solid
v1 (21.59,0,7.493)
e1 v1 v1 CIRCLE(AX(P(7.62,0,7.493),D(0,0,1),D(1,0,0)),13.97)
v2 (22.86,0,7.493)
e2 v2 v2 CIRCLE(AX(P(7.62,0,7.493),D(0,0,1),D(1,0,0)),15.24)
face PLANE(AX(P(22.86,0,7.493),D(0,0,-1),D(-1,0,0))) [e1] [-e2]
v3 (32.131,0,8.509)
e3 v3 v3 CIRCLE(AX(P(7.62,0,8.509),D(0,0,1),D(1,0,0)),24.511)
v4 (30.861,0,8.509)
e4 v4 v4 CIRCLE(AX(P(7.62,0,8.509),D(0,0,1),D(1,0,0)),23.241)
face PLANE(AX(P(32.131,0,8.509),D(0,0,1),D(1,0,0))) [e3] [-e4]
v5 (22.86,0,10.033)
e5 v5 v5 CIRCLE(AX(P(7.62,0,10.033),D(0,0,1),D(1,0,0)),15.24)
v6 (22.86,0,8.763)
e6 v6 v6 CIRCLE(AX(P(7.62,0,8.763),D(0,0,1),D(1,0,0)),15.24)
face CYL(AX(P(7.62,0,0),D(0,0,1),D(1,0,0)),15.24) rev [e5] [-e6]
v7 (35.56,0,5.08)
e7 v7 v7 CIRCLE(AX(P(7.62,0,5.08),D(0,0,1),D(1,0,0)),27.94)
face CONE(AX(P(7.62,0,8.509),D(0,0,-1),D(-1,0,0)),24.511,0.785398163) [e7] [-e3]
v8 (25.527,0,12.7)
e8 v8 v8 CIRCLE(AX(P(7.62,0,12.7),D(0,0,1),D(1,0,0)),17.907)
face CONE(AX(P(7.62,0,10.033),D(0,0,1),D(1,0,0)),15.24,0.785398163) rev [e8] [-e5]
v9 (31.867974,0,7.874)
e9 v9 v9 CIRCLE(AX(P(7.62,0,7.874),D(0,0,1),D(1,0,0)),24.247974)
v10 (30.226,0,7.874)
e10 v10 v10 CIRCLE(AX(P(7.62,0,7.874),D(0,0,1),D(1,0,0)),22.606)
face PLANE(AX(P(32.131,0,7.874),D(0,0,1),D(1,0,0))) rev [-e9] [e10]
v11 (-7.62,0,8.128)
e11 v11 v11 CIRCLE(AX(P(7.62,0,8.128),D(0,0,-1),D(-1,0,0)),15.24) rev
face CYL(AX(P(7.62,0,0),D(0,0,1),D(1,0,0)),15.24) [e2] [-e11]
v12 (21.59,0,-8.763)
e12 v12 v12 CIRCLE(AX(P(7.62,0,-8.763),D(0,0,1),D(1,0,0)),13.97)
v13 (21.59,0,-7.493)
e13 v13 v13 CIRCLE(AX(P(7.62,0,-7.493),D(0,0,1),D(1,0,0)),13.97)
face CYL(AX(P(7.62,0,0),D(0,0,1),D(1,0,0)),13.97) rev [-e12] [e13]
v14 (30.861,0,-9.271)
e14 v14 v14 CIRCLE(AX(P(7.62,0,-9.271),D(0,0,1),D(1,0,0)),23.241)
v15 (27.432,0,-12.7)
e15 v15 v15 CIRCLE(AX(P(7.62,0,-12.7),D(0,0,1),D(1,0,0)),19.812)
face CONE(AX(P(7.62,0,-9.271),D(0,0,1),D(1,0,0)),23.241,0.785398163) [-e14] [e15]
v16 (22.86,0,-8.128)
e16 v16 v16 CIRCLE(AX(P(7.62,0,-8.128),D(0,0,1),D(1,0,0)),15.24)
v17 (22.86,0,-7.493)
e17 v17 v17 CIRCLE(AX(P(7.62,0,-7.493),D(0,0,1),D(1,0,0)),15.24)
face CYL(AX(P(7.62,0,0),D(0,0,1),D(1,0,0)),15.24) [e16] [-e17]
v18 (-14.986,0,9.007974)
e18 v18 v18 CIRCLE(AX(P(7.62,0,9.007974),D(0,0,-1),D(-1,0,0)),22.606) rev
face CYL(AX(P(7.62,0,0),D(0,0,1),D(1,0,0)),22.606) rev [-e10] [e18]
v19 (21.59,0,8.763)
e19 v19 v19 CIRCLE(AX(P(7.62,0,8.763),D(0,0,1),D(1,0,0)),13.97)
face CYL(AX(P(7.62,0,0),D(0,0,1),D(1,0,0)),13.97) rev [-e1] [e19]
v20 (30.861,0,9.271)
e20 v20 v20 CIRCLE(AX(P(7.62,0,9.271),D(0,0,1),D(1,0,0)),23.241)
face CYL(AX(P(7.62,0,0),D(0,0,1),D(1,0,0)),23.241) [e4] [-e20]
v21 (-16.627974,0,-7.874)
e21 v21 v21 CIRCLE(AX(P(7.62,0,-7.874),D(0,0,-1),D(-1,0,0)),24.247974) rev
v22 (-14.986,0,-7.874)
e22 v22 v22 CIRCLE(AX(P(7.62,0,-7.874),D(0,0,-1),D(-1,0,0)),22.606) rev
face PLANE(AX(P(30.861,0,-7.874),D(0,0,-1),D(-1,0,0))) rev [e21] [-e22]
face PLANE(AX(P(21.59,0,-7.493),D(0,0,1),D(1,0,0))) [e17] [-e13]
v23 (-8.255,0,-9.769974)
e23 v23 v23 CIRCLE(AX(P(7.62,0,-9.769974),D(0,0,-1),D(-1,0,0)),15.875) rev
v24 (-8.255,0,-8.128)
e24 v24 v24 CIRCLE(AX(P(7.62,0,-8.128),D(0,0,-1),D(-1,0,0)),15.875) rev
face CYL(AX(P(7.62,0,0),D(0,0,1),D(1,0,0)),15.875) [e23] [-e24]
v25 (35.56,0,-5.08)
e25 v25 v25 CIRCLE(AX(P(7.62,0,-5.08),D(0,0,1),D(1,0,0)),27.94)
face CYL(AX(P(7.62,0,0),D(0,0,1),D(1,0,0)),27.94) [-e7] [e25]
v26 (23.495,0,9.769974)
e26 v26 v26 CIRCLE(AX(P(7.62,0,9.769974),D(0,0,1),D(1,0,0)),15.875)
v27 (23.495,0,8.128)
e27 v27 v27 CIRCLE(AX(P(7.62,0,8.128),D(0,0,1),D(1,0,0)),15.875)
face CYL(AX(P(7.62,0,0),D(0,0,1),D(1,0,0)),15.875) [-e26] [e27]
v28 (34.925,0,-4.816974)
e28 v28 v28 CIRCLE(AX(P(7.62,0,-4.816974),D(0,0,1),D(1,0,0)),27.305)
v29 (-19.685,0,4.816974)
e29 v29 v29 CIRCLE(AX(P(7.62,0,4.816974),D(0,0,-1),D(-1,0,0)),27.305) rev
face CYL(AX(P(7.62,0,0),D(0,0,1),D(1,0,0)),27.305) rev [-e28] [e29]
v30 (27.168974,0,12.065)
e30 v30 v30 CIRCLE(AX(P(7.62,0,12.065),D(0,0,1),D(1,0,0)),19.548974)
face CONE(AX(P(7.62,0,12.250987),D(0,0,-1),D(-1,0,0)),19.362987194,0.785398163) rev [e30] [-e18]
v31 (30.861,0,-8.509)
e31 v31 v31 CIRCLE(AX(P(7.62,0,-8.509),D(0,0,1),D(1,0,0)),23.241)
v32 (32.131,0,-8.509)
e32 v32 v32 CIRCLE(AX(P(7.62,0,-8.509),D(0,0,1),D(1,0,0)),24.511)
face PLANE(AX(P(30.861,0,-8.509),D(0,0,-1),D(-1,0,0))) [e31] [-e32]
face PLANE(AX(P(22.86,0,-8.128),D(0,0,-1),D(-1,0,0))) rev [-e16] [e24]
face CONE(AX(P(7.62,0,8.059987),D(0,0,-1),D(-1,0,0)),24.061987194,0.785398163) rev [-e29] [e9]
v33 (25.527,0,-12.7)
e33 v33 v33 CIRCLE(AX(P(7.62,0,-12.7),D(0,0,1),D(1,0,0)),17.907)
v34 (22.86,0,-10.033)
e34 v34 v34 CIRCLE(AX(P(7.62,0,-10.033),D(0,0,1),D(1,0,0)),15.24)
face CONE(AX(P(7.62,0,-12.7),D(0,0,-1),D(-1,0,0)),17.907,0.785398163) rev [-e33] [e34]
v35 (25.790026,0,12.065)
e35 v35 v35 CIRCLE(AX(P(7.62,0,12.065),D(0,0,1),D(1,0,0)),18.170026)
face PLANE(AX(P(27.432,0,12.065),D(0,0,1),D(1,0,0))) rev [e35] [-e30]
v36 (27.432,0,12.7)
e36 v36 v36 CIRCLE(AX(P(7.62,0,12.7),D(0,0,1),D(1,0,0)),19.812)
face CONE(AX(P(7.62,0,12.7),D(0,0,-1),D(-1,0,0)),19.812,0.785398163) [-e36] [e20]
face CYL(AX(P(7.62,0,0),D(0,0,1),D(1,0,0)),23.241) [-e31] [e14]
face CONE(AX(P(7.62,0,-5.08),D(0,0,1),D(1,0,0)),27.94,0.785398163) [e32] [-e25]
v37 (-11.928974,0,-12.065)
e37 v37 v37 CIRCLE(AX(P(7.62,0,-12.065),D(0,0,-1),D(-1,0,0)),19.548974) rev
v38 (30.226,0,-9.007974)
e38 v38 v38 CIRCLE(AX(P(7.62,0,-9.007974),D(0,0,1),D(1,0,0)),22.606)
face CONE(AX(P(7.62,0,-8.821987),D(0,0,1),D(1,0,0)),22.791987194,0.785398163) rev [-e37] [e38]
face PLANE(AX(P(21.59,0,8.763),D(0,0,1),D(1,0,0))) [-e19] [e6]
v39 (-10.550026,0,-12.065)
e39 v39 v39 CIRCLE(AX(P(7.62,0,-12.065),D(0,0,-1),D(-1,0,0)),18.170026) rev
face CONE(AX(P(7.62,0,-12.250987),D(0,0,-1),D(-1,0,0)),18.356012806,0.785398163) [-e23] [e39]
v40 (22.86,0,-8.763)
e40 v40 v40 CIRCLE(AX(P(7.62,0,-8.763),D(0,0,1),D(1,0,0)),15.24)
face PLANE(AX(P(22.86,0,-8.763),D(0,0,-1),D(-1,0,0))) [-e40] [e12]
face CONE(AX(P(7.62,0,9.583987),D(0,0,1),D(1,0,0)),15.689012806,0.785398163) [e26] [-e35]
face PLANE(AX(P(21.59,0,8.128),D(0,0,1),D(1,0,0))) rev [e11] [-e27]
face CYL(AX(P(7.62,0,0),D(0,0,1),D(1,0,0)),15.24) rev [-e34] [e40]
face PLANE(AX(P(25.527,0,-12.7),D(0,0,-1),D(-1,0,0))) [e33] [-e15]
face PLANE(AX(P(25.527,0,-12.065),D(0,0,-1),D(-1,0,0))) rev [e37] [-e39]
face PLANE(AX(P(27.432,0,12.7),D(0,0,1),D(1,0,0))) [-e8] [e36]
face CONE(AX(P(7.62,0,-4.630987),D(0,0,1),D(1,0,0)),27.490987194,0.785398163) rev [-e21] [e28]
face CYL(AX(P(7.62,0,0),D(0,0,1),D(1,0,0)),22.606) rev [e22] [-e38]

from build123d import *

# Parameters (mm, degrees)
EXTRUDE1_DEPTH      = 3.81
EXTRUDE2_DEPTH      = 0.508
CUT_EXTRUDE2_DEPTH  = 15.255714644
EXTRUDE3_DEPTH      = 3.302
EXTRUDE4_REACH      = 14.636
SKETCH9_W           = 3.553663376
SKETCH9_H           = 0.1905
SKETCH11_R          = 2.286
CUT_EXTRUDE3_DEPTH  = 13.636340451
SKETCH12_R          = 3.175
CUT_EXTRUDE4_DEPTH  = 0.508
SKETCH13_OUTSIDE_W  = 29.914
SKETCH13_OUTSIDE_H  = 14.674
SKETCH13_OUTSIDE_R  = 3.81
CUT_EXTRUDE5_DEPTH  = 15.255714644
CUT_EXTRUDE7_START  = 6.604
CUT_EXTRUDE7_DEPTH  = 6.604
SCALE1_SCALE_X      = 1
SCALE1_SCALE_Y      = 1
SCALE1_SCALE_Z      = 2.633333333
EXTRUDE6_DEPTH      = 30.24890252
EXTRUDE6_DEPTH_BACK = 30.24890252
SKETCH20_R          = 2.286
SKETCH21_R          = 12.7
SKETCH21_R_2        = 3.81
EXTRUDE7_DEPTH      = 10.16
EXTRUDE7_TAPER      = 35


# Read off the part's stored shape, not the designer's step: Shell1
with BuildPart() as part:
    # Sketch1 → Extrude1 (new body)
    with BuildSketch(Plane(origin=(0, 0, 0), x_dir=(1, 0, 0), z_dir=(0, 1, 0))):
        with BuildLine():
            Line((-7.62, 3.81), (0, 3.81))
            ThreePointArc((0, 3.81), (3.81, 0), (0, -3.81))
            Line((0, -3.81), (-7.62, -3.81))
            ThreePointArc((-7.62, -3.81), (-11.43, 0), (-7.62, 3.81))
        make_face()
    extrude(amount=EXTRUDE1_DEPTH)

    # Sketch4 → Extrude2 (add)
    with BuildSketch(Plane.XY.offset(3.81)):
        with BuildLine():
            Line((0, 0), (0, 3.81))
            Line((0, 3.81), (7.62, 3.81))
            ThreePointArc((7.62, 3.81), (10.314076836, 2.694076836), (11.43, 0))
            Line((11.43, 0), (7.62, 0))
            Line((7.62, 0), (0, 0))
        make_face()
    extrude2 = extrude(amount=-EXTRUDE2_DEPTH)

    # Sketch6 → Cut-Extrude2 (cut, through all)
    with BuildSketch(Plane.XY.offset(3.81)):
        with BuildLine():
            Line((6.858, 2.032), (6.858, 1.016))
            ThreePointArc((6.858, 1.016), (6.783605122, 0.836394878), (6.604, 0.762))
            Line((6.604, 0.762), (5.588, 0.762))
            ThreePointArc((5.588, 0.762), (5.408394878, 0.687605122), (5.334, 0.508))
            Line((5.334, 0.508), (5.334, -0.508))
            ThreePointArc((5.334, -0.508), (5.408394878, -0.687605122), (5.588, -0.762))
            Line((5.588, -0.762), (6.604, -0.762))
            ThreePointArc((6.604, -0.762), (6.783605122, -0.836394878), (6.858, -1.016))
            Line((6.858, -1.016), (6.858, -2.032))
            ThreePointArc((6.858, -2.032), (6.932394878, -2.211605122), (7.112, -2.286))
            Line((7.112, -2.286), (8.128, -2.286))
            ThreePointArc((8.128, -2.286), (8.307605122, -2.211605122), (8.382, -2.032))
            Line((8.382, -2.032), (8.382, -1.016))
            ThreePointArc((8.382, -1.016), (8.456394878, -0.836394878), (8.636, -0.762))
            Line((8.636, -0.762), (9.652, -0.762))
            ThreePointArc((9.652, -0.762), (9.831605122, -0.687605122), (9.906, -0.508))
            Line((9.906, -0.508), (9.906, 0.508))
            ThreePointArc((9.906, 0.508), (9.831605122, 0.687605122), (9.652, 0.762))
            Line((9.652, 0.762), (8.636, 0.762))
            ThreePointArc((8.636, 0.762), (8.456394878, 0.836394878), (8.382, 1.016))
            Line((8.382, 1.016), (8.382, 2.032))
            ThreePointArc((8.382, 2.032), (8.307605122, 2.211605122), (8.128, 2.286))
            Line((8.128, 2.286), (7.112, 2.286))
            ThreePointArc((7.112, 2.286), (6.932394878, 2.211605122), (6.858, 2.032))
        make_face()
    cut_extrude2 = extrude(amount=-CUT_EXTRUDE2_DEPTH, mode=Mode.SUBTRACT)

    # Sketch8 → Extrude3 (add)
    with BuildSketch(Plane(origin=(0, 0, 3.302), x_dir=(-1, 0, 0), z_dir=(0, 0, -1))):
        with BuildLine():
            Line((-10.795, 0), (-10.414, 0))
            ThreePointArc((-10.414, 0), (-9.726056742, 1.836017701), (-8.001, 2.767900829))
            Line((-8.001, 2.767900829), (-8.001, 3.152057106))
            ThreePointArc((-8.001, 3.152057106), (-9.995952441, 2.106056742), (-10.795, 0))
        make_face()
        with BuildLine():
            Line((-4.826, 0), (-4.445, 0))
            ThreePointArc((-4.445, 0), (-5.244047559, 2.106056742), (-7.239, 3.152057106))
            Line((-7.239, 3.152057106), (-7.239, 2.767900829))
            ThreePointArc((-7.239, 2.767900829), (-5.513943258, 1.836017701), (-4.826, 0))
        make_face()
    extrude3 = extrude(amount=EXTRUDE3_DEPTH)

    # Sketch9 → Extrude4 (add, up to next)
    with BuildSketch(Plane(origin=(0, 0, 0), x_dir=(-1, 0, 0), z_dir=(0, 0, -1)), mode=Mode.PRIVATE) as extrude4_sk1:
        with Locations((-2.858668312, 0.09525)):
            Rectangle(SKETCH9_W, SKETCH9_H)
    extrude4_tool1 = extrude(extrude4_sk1.sketch, amount=-EXTRUDE4_REACH, mode=Mode.PRIVATE) - part.part
    extrude4 = extrude4_tool1.solids().sort_by_distance((2.858668, 0.09525, 0))[0]
    add(extrude4)

    # Mirror5: Extrude2, Cut-Extrude2, Extrude3, Extrude4 across plane
    add(extrude2.mirror(Plane(origin=(7.62, 0, 0), x_dir=(1, 0, 0), z_dir=(0, 0, -1))))
    add(cut_extrude2.mirror(Plane(origin=(7.62, 0, 0), x_dir=(1, 0, 0), z_dir=(0, 0, -1))), mode=Mode.SUBTRACT)
    add(extrude3.mirror(Plane(origin=(7.62, 0, 0), x_dir=(1, 0, 0), z_dir=(0, 0, -1))))
    add(extrude4.mirror(Plane(origin=(7.62, 0, 0), x_dir=(1, 0, 0), z_dir=(0, 0, -1))))

    # Sketch11 → Cut-Extrude3 (cut, through all)
    with BuildSketch(Plane(origin=(0, 3.81, 0), x_dir=(1, 0, 0), z_dir=(0, 1, 0))):
        with Locations(Location((0, 0, 0), (0, 0, 270))):
            Circle(SKETCH11_R)
        with Locations(Location((-7.62, 0, 0), (0, 0, 270))):
            Circle(SKETCH11_R)
    extrude(amount=-CUT_EXTRUDE3_DEPTH, mode=Mode.SUBTRACT)

    # Sketch12 → Cut-Extrude4 (cut)
    with BuildSketch(Plane(origin=(0, 3.81, 0), x_dir=(1, 0, 0), z_dir=(0, 1, 0))):
        with Locations(Location((0, 0, 0), (0, 0, 270))):
            Circle(SKETCH12_R)
        with Locations(Location((-7.62, 0, 0), (0, 0, 270))):
            Circle(SKETCH12_R)
    extrude(amount=-CUT_EXTRUDE4_DEPTH, mode=Mode.SUBTRACT)

    # Mirror6: part across face


with BuildPart() as part_1:
    add(part.part)
    add(part.part.mirror(Plane(origin=(-2.524422527, 0, 0), x_dir=(0, 0, 1), z_dir=(0, -1, 0))))

    # Sketch13 outside → Cut-Extrude5 (cut, through all)
    with BuildSketch(Plane.XY.offset(3.81)):
        Rectangle(SKETCH13_OUTSIDE_W, SKETCH13_OUTSIDE_H)
        with Locations((7.62, 0)):
            Circle(SKETCH13_OUTSIDE_R, mode=Mode.SUBTRACT)
    extrude(amount=-CUT_EXTRUDE5_DEPTH, mode=Mode.SUBTRACT)

    # Sketch15 → Cut-Extrude7 (cut)
    with BuildSketch(Plane.XY.offset(-3.302).offset(CUT_EXTRUDE7_START)):
        with BuildLine():
            Line((4.486048338, 2.166667252), (5.299185915, 2.166667252))
            ThreePointArc((5.299185915, 2.166667252), (4.44500552, -0.00592023), (5.307282146, -2.175307134))
            Line((5.307282146, -2.175307134), (4.492039183, -2.175307134))
            ThreePointArc((4.492039183, -2.175307134), (3.810003627, -0.005256847), (4.486048338, 2.166667252))
        make_face()
    extrude(amount=-CUT_EXTRUDE7_DEPTH, mode=Mode.SUBTRACT)


with BuildPart() as part_2:
    # Scale1: scaled about (0, 0, 0)
    add(part_1.part.scale((SCALE1_SCALE_X, SCALE1_SCALE_Y, SCALE1_SCALE_Z), about=(0, 0, 0)))

    # Sketch17 → Revolve1 (revolve)
    with BuildSketch(Plane(origin=(0, 0, 0), x_dir=(1, 0, 0), z_dir=(0, 1, 0))):
        Polygon((10.414, 10.033), (10.414, -10.033), (22.86, -10.033), (22.86, -8.763), (21.59, -8.763), (21.59, -7.493), (22.86, -7.493), (22.86, -6.223), (21.59, -2.54), (21.59, 2.54), (22.86, 6.223), (22.86, 7.493), (21.59, 7.493), (21.59, 8.763), (22.86, 8.763), (22.86, 10.033), align=None)
    revolve(axis=Axis((7.62, 0, 0), (0, 0, -1)))

    # Sketch20 → Extrude6 (cut, two sides: drawn at the far end of the back side and taken through both)
    with BuildSketch(Plane.XY.offset(-EXTRUDE6_DEPTH_BACK)):
        with Locations((7.62, 7.62)):
            Circle(SKETCH20_R)
        with Locations((14.219113577, 3.81)):
            Circle(SKETCH20_R)
        with Locations((14.219113577, -3.81)):
            Circle(SKETCH20_R)
        with Locations((7.62, -7.62)):
            Circle(SKETCH20_R)
        with Locations((1.020886423, -3.81)):
            Circle(SKETCH20_R)
        with Locations((1.020886423, 3.81)):
            Circle(SKETCH20_R)
    extrude(amount=EXTRUDE6_DEPTH + EXTRUDE6_DEPTH_BACK, mode=Mode.SUBTRACT)

    # Sketch21 → Extrude7 (cut)
    with BuildSketch(Plane.XY.offset(10.033)):
        with Locations((7.62, 0)):
            Circle(SKETCH21_R)
        with Locations((7.62, 0)):
            Circle(SKETCH21_R_2, mode=Mode.SUBTRACT)
    extrude7 = extrude(amount=-EXTRUDE7_DEPTH, taper=EXTRUDE7_TAPER, mode=Mode.SUBTRACT)

    # Mirror7: Extrude7 across plane
    add(extrude7.mirror(Plane.XY), mode=Mode.SUBTRACT)


with BuildPart() as body_2:
    # Sketch22 → Revolve2 (revolve)
    with BuildSketch(Plane(origin=(0, 0, 0), x_dir=(1, 0, 0), z_dir=(0, 1, 0))):
        Polygon((22.86, -8.763), (22.86, -10.033), (25.527, -12.7), (27.432, -12.7), (30.861, -9.271), (30.861, -8.509), (32.131, -8.509), (35.56, -5.08), (35.56, 5.08), (32.131, 8.509), (30.861, 8.509), (30.861, 9.271), (27.432, 12.7), (25.527, 12.7), (22.86, 10.033), (22.86, 8.763), (21.59, 8.763), (21.59, 7.493), (22.86, 7.493), (22.86, 6.223), (21.59, 2.54), (21.59, -2.54), (22.86, -6.223), (22.86, -7.493), (21.59, -7.493), (21.59, -8.763), align=None)
    revolve(axis=Axis((7.62, 0, 0), (0, 0, -1)))

    # Shell1 outline → Shell1 (revolve, cut)
    with BuildSketch(Plane(origin=(7.62, 0, 0), x_dir=(1, 0, 0), z_dir=(0, -1, 0))):
        Polygon((15.24, -8.128), (15.875, -8.128), (15.875, -9.769974388), (18.170025612, -12.065), (19.548974388, -12.065), (22.606, -9.007974388), (22.606, -7.874), (24.247974388, -7.874), (27.305, -4.816974388), (27.305, 4.816974388), (24.247974388, 7.874), (22.606, 7.874), (22.606, 9.007974388), (19.548974388, 12.065), (18.170025612, 12.065), (15.875, 9.769974388), (15.875, 8.128), (15.24, 8.128), (15.24, 6.223), (13.97, 2.54), (13.97, -2.54), (15.24, -6.223), align=None)
    revolve(axis=Axis((7.62, 0, 0), (0, 0, 1)), mode=Mode.SUBTRACT)


solid = body_2.part
